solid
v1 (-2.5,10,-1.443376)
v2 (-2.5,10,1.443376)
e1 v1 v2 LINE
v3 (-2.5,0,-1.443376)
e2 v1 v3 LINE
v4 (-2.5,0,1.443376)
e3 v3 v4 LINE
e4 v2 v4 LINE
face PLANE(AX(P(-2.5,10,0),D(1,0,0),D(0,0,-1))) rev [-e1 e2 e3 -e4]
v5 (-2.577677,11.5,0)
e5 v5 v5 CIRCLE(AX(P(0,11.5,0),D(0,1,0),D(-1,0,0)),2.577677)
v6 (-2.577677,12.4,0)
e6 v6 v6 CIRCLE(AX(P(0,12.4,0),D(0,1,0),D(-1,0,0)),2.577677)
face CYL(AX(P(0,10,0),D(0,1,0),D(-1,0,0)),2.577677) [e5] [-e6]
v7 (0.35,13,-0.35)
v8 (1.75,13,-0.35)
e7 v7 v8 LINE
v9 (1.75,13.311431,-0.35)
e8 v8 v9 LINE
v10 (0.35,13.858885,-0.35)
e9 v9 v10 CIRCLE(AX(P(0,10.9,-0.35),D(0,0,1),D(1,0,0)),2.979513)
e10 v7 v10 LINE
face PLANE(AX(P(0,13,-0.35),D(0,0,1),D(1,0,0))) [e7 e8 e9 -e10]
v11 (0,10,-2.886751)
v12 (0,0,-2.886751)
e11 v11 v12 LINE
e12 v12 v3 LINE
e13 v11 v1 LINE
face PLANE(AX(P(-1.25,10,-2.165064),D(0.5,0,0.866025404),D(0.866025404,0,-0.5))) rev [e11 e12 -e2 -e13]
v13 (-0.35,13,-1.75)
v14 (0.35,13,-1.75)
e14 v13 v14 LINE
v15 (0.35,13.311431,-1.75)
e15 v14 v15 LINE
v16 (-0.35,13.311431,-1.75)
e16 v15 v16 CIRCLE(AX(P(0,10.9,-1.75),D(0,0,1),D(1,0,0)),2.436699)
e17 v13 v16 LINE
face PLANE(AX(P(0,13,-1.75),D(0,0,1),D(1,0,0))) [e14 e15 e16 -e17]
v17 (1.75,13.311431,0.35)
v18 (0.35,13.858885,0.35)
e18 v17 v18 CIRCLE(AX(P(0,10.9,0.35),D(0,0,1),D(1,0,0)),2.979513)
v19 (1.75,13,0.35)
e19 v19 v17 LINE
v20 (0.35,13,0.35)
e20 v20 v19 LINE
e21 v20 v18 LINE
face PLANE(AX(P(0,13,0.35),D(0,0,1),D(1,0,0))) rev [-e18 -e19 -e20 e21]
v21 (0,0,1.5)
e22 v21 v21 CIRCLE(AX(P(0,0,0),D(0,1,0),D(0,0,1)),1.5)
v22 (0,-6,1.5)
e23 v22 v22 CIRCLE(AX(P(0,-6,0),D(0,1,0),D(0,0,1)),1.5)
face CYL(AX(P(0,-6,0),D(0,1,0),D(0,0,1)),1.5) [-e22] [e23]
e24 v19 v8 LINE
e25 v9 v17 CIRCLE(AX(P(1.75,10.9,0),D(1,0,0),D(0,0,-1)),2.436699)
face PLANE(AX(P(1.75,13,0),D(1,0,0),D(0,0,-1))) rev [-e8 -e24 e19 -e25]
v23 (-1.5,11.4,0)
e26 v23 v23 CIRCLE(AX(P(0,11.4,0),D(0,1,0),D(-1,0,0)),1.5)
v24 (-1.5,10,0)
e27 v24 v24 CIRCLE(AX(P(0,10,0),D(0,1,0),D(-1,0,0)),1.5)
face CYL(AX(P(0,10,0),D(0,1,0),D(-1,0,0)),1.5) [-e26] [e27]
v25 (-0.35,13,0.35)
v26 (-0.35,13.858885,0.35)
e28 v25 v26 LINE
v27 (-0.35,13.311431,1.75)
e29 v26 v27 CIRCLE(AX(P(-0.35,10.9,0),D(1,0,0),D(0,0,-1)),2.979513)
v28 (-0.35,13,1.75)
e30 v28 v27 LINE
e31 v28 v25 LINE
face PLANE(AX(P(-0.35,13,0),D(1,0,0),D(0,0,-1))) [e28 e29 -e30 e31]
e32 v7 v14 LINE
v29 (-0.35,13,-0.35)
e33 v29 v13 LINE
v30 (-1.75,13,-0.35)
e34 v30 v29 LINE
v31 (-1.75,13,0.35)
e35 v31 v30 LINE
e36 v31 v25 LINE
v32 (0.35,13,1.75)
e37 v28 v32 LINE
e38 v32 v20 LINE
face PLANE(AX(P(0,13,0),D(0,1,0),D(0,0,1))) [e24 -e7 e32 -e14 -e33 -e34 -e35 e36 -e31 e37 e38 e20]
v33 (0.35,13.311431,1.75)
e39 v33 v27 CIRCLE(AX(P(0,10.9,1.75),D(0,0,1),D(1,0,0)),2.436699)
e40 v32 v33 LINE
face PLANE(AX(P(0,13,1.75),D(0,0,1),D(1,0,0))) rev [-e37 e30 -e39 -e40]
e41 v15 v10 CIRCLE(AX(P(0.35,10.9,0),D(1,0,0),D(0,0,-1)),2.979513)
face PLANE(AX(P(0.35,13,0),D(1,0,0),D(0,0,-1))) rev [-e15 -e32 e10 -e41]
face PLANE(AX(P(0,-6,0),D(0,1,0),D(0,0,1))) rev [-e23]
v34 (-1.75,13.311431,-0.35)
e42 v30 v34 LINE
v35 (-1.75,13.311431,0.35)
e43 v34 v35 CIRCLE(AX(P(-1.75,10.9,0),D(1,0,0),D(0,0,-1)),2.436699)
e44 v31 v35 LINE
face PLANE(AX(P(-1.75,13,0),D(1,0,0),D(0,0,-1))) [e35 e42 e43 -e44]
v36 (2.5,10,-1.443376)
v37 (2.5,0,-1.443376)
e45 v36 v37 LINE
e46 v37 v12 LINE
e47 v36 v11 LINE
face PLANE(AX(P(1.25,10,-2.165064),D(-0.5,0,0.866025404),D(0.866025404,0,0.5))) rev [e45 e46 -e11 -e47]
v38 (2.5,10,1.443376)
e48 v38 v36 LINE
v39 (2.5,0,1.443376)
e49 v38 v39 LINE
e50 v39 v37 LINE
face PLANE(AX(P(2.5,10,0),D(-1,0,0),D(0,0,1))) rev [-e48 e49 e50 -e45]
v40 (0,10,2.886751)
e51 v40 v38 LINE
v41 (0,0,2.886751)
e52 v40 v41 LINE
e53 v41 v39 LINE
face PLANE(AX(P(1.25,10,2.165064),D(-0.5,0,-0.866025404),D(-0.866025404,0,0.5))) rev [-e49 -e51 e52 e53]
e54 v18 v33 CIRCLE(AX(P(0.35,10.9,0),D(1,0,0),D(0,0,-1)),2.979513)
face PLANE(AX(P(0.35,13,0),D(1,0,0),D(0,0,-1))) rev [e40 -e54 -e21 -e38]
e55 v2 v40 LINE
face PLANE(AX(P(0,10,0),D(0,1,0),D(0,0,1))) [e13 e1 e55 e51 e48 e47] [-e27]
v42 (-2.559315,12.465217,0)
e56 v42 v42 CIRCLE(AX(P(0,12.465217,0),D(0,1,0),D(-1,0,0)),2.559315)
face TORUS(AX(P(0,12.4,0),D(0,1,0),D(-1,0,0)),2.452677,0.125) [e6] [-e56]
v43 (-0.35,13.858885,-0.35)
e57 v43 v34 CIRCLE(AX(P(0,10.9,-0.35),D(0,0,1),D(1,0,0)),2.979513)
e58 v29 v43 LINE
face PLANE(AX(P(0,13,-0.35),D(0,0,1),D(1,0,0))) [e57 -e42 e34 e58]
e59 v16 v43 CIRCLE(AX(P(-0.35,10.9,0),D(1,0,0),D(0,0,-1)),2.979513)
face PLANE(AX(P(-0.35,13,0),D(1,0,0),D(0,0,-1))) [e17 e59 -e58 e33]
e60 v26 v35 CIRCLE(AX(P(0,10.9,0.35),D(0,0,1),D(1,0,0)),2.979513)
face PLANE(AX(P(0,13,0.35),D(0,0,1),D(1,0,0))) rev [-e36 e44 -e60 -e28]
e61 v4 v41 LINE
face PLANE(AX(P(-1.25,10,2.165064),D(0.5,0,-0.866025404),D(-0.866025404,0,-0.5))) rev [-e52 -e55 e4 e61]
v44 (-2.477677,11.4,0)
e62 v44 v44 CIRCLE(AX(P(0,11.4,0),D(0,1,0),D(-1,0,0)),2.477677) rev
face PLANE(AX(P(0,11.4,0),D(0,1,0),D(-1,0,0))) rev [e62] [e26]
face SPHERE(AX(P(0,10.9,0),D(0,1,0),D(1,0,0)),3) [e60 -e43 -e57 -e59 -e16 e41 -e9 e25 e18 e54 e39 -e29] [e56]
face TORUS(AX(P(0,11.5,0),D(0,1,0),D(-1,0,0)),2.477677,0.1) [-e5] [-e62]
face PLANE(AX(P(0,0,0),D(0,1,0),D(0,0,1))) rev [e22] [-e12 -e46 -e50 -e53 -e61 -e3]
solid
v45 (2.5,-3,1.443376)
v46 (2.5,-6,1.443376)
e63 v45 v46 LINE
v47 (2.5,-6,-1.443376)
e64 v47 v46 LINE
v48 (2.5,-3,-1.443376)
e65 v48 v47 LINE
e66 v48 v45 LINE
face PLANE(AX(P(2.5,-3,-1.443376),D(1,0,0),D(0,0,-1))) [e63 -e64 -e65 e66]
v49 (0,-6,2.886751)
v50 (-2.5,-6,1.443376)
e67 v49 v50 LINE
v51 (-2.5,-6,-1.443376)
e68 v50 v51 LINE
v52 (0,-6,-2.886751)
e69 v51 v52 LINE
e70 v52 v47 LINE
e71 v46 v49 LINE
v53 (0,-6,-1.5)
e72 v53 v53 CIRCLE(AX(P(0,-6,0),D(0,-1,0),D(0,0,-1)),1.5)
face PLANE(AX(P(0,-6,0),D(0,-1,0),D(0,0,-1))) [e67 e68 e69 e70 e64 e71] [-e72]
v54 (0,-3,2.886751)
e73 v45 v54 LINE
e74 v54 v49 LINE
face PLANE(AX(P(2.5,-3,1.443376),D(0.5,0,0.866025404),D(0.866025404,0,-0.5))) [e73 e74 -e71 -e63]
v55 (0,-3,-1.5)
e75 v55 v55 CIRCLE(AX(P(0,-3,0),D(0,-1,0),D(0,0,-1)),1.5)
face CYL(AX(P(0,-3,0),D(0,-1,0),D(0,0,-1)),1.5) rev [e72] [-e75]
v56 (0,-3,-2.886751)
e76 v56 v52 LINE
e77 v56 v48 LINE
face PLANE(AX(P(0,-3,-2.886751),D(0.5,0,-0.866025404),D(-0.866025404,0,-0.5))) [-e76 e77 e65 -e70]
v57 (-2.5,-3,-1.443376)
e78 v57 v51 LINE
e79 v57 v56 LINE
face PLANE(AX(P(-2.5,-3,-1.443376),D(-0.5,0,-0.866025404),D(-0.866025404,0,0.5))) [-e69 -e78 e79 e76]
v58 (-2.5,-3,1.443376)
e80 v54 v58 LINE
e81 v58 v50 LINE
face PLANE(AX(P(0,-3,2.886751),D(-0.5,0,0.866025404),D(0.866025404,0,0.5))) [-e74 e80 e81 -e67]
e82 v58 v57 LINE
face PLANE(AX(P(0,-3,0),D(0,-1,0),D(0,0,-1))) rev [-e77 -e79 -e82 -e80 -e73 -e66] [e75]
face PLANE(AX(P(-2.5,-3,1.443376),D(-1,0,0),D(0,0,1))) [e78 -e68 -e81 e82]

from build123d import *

# Parameters (mm, degrees)
BOSS_EXTRUDE1_DEPTH = 10
SKETCH1_4_R         = 1.5
BOSS_EXTRUDE2_DEPTH = 6
CUT_EXTRUDE1_DEPTH  = 7
FILLET1_R           = 0.1
SKETCH5_R           = 1.5
BOSS_EXTRUDE3_DEPTH = 3


with BuildPart() as part:
    # Sketch1 → Boss-Extrude1 (new body)
    with BuildSketch(Plane(origin=(0, 0, 0), x_dir=(1, 0, 0), z_dir=(0, 1, 0))):
        Polygon((2.5, -1.443375673), (2.5, 1.443375673), (0, 2.886751346), (-2.5, 1.443375673), (-2.5, -1.443375673), (0, -2.886751346), align=None)
    extrude(amount=BOSS_EXTRUDE1_DEPTH)

    # Sketch1<4> → Boss-Extrude2 (add)
    with BuildSketch(Plane(origin=(0, 0, 0), x_dir=(1, 0, 0), z_dir=(0, 1, 0))):
        Circle(SKETCH1_4_R)
    extrude(amount=-BOSS_EXTRUDE2_DEPTH)

    # Sketch3 → Revolve1 (revolve)
    with BuildSketch(Plane.XY):
        with BuildLine():
            Line((0, 10), (1.5, 10))
            Line((1.5, 10), (1.5, 11.4))
            Line((1.5, 11.4), (2.577677109, 11.4))
            Line((2.577677109, 11.4), (2.577677109, 12.4))
            ThreePointArc((2.577677109, 12.4), (2.572999108, 12.43387649), (2.559315243, 12.465217392))
            ThreePointArc((2.559315243, 12.465217392), (1.46702894, 13.516835128), (0, 13.9))
            Line((0, 13.9), (0, 10))
        make_face()
    revolve(axis=Axis((0, 10, 0), (0, -1, 0)))

    # Sketch4 → Cut-Extrude1 (cut)
    with BuildSketch(Plane(origin=(0, 20, 0), x_dir=(1, 0, 0), z_dir=(0, 1, 0))):
        Polygon((-1.75, 0.35), (-1.75, -0.35), (-0.35, -0.35), (-0.35, -1.75), (0.35, -1.75), (0.35, -0.35), (1.75, -0.35), (1.75, 0.35), (0.35, 0.35), (0.35, 1.75), (-0.35, 1.75), (-0.35, 0.35), align=None)
    extrude(amount=-CUT_EXTRUDE1_DEPTH, mode=Mode.SUBTRACT)

    # Fillet1
    fillet1_edges = [part.edges().sort_by_distance(p)[0] for p in [
        (-2.577677109, 11.4, 0),
    ]]
    fillet(fillet1_edges, radius=FILLET1_R)


with BuildPart() as body_2:
    # Sketch5 → Boss-Extrude3 (new body)
    with BuildSketch(Plane.XZ.offset(6)):
        Polygon((2.5, 1.443375673), (0, 2.886751346), (-2.5, 1.443375673), (-2.5, -1.443375673), (0, -2.886751346), (2.5, -1.443375673), align=None)
        Circle(SKETCH5_R, mode=Mode.SUBTRACT)
    extrude(amount=-BOSS_EXTRUDE3_DEPTH)


solid = Compound([part.part, body_2.part])
